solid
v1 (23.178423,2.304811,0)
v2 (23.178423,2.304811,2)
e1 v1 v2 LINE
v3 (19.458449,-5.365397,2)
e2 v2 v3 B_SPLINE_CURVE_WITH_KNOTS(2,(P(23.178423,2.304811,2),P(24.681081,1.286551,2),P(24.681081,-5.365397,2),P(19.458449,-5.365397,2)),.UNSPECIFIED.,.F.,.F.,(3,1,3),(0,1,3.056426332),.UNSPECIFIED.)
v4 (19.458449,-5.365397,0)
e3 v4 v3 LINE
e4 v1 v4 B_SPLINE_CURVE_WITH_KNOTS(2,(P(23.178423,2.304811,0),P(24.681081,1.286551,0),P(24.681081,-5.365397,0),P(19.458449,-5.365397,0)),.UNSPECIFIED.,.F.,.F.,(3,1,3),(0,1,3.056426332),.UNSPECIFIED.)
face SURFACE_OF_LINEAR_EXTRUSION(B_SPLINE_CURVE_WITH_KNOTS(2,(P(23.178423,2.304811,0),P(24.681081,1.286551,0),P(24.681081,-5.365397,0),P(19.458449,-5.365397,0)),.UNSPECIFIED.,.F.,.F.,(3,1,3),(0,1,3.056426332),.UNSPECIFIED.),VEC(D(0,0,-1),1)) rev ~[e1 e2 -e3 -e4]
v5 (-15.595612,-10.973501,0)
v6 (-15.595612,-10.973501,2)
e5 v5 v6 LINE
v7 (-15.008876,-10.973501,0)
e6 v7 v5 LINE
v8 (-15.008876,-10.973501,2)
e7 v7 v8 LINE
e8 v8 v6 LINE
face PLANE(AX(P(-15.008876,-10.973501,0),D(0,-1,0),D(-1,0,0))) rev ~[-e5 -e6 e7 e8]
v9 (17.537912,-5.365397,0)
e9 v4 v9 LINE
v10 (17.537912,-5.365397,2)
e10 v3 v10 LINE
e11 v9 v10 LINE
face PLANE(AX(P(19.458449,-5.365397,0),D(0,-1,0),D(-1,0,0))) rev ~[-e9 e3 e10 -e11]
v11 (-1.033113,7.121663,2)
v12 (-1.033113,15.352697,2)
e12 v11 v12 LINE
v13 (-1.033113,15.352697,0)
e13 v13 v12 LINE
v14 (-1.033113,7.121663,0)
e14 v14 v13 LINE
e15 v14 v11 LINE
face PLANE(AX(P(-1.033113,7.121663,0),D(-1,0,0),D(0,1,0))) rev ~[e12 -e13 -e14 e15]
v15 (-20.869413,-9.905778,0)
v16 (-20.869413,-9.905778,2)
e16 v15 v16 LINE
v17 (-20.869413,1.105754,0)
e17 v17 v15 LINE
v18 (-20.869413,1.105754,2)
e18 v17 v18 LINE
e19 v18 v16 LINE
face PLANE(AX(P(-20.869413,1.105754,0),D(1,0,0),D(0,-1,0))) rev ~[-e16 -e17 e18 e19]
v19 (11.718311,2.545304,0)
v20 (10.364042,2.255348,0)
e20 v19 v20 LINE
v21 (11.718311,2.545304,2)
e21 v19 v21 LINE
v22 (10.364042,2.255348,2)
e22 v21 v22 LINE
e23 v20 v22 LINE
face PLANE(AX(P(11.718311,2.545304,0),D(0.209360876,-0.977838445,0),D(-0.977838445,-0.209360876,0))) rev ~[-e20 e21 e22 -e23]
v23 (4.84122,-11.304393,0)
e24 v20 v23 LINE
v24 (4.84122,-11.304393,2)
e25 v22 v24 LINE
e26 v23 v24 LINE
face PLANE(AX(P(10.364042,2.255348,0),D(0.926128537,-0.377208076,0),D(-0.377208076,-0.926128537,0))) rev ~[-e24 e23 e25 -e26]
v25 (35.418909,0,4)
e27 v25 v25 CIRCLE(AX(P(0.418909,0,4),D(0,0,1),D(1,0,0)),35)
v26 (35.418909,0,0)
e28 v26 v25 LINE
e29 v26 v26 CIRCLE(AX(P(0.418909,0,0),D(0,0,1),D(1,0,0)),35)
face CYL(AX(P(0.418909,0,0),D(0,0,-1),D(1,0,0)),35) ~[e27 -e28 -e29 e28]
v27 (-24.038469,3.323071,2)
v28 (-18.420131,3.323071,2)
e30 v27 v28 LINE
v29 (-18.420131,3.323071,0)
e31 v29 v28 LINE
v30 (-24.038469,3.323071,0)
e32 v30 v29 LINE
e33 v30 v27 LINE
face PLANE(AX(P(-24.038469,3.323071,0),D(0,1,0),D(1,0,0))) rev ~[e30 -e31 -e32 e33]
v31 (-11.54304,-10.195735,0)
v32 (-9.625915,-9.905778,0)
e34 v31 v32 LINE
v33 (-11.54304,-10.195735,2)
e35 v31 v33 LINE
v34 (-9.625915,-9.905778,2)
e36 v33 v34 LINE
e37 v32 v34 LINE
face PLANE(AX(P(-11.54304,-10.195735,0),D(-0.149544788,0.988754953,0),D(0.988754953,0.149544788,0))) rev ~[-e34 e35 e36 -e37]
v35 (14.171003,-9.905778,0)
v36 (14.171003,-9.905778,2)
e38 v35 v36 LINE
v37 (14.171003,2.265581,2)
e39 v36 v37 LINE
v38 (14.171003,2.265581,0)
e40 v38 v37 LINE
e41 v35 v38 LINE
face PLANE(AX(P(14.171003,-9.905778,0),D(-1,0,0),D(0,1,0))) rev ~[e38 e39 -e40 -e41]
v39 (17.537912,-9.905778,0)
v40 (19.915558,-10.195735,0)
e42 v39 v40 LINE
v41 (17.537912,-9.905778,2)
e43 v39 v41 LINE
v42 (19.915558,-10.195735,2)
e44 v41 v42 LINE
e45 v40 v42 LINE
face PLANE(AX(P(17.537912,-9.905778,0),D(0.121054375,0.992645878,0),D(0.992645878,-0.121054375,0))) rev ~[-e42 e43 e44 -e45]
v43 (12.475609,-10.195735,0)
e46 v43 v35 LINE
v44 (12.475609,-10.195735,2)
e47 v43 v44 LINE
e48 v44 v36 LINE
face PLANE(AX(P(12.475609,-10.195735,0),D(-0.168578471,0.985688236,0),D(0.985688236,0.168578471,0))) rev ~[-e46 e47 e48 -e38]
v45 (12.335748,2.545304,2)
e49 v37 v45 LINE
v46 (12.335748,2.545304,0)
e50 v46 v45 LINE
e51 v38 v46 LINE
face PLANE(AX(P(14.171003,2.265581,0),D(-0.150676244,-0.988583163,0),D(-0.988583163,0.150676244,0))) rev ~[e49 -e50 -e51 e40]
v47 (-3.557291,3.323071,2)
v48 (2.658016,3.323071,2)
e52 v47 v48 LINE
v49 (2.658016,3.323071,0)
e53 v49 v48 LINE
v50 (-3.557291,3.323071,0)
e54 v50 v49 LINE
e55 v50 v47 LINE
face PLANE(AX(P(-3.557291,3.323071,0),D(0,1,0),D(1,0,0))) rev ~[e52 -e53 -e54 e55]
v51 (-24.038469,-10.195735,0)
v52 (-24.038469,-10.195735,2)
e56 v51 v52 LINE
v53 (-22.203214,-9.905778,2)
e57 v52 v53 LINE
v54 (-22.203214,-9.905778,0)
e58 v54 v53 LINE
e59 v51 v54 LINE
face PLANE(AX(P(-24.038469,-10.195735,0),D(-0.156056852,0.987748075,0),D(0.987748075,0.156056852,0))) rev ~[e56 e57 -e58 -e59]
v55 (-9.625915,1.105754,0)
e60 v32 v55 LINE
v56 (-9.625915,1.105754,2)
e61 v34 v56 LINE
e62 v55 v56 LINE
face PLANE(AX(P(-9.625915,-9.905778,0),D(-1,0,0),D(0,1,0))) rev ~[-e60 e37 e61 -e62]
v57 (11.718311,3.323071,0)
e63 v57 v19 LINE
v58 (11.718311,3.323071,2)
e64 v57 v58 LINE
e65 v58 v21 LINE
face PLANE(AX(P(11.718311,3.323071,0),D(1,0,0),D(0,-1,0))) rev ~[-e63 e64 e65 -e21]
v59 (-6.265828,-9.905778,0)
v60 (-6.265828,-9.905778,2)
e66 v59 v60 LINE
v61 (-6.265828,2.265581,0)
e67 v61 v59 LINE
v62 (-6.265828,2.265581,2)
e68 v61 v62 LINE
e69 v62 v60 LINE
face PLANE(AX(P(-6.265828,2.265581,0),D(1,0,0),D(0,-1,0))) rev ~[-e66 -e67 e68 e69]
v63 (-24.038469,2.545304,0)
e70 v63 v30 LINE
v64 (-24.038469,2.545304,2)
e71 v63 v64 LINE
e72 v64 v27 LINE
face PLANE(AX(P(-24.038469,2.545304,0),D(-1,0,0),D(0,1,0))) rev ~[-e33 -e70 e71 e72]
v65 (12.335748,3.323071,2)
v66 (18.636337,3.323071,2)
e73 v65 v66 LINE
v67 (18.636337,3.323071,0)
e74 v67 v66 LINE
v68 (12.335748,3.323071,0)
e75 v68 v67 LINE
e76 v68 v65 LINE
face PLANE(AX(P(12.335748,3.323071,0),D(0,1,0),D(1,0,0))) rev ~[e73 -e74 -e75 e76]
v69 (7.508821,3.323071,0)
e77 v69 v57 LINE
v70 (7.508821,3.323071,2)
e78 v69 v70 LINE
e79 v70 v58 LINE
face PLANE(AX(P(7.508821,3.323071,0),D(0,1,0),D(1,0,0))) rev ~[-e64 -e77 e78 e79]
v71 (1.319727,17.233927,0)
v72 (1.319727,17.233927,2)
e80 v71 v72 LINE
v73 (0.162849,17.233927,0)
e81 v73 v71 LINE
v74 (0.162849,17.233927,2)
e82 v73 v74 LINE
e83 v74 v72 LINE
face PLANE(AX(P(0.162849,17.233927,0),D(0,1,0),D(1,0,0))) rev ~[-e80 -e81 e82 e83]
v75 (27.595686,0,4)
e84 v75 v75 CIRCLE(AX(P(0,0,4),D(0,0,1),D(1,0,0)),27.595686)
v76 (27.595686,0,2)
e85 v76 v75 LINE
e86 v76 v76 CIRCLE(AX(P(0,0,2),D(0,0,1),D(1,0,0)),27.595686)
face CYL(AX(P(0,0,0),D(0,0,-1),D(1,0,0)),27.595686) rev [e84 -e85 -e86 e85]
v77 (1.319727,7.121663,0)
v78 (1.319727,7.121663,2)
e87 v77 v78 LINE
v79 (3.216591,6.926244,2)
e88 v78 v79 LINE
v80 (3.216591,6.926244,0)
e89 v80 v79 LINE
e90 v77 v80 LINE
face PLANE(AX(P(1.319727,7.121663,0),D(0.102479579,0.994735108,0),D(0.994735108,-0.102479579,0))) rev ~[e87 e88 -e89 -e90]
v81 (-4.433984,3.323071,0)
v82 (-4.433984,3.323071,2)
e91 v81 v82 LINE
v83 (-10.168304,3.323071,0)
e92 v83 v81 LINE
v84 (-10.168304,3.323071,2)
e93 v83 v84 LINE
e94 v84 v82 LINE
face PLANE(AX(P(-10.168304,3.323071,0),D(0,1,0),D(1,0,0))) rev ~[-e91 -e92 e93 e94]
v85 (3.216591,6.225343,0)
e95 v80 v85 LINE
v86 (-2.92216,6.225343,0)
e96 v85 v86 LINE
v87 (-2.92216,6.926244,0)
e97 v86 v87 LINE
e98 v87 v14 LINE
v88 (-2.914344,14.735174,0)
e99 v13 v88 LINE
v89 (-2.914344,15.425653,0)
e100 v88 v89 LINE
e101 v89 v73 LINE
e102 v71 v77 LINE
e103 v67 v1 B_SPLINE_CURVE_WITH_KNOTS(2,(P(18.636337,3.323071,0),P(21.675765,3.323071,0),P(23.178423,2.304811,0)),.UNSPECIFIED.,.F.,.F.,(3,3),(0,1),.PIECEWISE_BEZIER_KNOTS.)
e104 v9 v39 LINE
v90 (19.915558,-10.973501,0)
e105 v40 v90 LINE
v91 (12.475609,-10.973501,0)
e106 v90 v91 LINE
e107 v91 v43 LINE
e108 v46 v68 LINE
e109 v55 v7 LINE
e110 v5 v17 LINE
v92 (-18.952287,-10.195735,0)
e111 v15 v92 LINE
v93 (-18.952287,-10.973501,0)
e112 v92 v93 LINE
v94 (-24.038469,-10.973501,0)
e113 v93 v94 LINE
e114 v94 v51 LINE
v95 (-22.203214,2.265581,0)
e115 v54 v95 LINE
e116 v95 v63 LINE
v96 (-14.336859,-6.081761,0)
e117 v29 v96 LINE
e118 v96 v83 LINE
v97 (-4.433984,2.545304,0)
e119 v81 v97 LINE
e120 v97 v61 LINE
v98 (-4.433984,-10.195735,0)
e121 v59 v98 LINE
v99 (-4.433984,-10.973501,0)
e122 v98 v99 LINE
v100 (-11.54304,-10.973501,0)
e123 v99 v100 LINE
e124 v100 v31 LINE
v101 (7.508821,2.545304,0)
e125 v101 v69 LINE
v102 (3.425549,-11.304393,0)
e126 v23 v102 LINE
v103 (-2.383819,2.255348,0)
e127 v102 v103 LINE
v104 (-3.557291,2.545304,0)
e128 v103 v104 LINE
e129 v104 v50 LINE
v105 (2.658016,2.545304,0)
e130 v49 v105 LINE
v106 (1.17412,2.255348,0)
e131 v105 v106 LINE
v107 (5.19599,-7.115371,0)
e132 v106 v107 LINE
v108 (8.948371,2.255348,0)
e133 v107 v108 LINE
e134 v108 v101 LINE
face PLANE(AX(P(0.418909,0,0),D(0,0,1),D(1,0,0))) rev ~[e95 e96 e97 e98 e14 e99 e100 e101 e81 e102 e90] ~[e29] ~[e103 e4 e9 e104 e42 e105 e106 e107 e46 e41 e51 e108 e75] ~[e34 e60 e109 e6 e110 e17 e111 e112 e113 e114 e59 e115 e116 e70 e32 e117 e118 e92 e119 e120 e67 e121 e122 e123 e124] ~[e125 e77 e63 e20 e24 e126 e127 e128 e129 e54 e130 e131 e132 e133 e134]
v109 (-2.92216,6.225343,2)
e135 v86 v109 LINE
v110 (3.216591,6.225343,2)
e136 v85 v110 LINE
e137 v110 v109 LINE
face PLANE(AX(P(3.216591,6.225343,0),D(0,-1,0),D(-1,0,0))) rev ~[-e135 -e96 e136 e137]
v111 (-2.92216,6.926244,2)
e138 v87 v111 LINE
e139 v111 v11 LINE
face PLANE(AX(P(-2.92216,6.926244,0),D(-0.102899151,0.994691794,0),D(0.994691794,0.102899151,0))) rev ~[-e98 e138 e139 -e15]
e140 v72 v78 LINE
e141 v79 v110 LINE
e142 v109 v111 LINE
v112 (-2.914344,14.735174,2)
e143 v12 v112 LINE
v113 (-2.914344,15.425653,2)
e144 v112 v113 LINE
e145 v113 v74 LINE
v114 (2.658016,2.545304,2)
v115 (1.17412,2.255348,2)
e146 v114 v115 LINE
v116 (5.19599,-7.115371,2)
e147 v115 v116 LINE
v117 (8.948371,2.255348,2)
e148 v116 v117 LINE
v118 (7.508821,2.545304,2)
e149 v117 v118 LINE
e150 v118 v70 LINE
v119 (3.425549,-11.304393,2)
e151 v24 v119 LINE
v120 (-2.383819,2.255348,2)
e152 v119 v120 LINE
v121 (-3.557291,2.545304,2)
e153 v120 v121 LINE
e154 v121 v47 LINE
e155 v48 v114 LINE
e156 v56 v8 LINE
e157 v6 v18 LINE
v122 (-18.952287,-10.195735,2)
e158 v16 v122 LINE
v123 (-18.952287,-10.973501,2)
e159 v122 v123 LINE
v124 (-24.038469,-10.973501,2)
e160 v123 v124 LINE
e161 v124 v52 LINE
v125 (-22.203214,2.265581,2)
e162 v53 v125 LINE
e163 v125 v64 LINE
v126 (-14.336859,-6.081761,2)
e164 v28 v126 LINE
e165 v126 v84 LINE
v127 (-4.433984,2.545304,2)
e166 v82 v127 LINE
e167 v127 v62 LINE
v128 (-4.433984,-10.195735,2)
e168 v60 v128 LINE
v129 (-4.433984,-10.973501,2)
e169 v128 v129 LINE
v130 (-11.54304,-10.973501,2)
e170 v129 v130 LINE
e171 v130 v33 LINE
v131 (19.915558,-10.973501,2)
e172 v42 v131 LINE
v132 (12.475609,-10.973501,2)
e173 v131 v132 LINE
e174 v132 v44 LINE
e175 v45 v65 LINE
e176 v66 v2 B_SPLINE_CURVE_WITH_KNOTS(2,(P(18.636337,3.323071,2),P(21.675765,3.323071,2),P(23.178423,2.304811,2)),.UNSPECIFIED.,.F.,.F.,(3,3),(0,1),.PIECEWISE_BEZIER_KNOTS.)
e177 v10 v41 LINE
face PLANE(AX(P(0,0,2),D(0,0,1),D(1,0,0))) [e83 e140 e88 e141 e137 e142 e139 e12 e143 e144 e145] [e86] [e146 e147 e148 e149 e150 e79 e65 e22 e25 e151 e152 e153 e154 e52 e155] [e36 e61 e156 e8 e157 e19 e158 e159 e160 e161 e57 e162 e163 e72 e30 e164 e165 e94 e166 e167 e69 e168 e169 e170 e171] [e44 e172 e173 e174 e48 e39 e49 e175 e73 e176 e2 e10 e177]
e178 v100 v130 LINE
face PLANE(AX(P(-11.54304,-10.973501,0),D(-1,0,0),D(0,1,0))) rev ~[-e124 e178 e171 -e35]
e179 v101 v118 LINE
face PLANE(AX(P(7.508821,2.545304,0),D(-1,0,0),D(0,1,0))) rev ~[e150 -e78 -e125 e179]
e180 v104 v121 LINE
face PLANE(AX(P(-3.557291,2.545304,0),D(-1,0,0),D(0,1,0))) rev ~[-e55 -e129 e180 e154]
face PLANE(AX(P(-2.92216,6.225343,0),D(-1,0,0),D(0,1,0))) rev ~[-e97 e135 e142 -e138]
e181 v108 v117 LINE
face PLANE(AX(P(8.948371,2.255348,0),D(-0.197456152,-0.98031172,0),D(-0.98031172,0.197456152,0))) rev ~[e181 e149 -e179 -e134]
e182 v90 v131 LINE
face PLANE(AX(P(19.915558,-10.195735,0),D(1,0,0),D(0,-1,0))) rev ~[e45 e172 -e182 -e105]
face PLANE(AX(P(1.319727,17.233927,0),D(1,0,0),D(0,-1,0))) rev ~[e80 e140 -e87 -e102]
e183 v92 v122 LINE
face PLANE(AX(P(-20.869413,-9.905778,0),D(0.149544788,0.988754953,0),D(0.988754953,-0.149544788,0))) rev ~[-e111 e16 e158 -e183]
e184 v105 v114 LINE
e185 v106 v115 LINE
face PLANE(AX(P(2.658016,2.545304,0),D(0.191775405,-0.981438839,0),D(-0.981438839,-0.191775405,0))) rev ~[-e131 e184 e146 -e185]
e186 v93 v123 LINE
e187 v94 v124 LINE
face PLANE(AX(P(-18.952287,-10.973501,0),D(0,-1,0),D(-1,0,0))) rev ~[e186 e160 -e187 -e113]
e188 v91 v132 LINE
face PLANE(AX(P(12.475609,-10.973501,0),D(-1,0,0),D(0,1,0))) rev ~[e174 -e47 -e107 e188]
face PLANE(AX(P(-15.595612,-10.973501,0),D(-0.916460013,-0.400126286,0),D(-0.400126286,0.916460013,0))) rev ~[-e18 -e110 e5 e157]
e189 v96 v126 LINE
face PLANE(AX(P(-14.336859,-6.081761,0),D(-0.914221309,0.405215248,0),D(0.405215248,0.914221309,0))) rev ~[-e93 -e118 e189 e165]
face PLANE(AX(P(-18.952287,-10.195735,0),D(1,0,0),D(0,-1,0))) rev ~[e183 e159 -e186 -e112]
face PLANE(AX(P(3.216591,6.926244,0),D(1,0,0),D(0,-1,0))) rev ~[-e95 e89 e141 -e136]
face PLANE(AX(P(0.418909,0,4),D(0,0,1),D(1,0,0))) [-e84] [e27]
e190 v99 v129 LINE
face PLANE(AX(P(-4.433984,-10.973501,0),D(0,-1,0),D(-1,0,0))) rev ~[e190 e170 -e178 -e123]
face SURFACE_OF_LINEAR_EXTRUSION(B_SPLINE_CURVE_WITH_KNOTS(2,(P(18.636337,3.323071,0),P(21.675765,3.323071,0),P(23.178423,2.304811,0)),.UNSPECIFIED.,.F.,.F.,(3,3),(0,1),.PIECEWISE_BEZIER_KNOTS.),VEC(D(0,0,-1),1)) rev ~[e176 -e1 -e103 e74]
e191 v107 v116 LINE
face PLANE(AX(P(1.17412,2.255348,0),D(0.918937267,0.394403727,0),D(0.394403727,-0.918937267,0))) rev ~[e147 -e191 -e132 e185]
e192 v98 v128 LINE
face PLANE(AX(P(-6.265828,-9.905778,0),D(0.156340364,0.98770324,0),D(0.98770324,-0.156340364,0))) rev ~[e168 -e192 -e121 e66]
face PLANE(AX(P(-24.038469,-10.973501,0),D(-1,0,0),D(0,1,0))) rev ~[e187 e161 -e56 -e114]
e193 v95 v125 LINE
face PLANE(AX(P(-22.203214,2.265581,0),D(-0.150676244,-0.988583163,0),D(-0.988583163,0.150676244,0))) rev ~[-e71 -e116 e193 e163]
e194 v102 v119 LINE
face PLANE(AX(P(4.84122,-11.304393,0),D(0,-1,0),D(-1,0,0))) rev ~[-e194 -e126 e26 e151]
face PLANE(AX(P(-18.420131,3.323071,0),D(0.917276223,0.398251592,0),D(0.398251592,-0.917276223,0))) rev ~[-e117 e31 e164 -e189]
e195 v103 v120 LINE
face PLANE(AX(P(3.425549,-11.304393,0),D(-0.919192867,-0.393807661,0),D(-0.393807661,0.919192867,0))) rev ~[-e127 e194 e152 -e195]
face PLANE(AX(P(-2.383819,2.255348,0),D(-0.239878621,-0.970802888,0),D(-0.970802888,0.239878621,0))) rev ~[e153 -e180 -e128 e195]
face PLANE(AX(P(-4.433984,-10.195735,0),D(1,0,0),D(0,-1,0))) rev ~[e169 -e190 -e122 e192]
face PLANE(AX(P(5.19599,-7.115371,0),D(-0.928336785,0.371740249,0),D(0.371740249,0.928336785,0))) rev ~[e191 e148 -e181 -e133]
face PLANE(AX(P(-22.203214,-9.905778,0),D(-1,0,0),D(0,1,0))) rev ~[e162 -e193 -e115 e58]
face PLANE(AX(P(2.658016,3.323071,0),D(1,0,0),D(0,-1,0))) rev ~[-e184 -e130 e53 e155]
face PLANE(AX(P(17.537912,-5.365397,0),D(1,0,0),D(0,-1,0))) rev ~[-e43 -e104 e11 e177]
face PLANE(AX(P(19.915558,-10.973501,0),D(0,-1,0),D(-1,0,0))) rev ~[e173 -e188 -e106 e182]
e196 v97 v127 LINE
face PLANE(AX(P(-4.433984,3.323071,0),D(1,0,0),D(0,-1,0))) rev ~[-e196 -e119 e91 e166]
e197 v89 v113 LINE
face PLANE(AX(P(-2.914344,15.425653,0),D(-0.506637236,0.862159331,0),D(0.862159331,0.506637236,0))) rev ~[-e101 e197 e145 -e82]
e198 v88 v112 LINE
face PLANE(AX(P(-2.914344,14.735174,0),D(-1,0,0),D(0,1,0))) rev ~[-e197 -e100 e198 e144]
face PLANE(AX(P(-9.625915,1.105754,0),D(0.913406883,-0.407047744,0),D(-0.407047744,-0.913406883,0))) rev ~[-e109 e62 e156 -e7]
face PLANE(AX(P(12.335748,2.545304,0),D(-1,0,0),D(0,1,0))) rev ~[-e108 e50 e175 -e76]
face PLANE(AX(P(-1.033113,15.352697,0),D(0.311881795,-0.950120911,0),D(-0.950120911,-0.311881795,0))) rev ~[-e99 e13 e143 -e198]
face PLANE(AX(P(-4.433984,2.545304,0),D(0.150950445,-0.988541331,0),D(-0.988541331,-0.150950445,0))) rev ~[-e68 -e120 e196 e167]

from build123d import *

# Parameters (mm, degrees)
F0_R     = 27.5956860517
F1_DEPTH = 2
F0_R_2   = 35
F2_DEPTH = 4


with BuildPart() as f1:
    # F0 (on Top) → F1 (new body)
    with BuildSketch(Plane.XY):
        Circle(F0_R)
        Polygon((-9.6259148038, 1.1057544772), (-15.0088759263, -10.9735011217), (-15.5956118662, -10.9735011217), (-20.8694128139, 1.1057544772), (-20.8694128139, -9.9057781613), (-18.952287243, -10.1957348758), (-18.952287243, -10.9735011217), (-24.0384691402, -10.9735011217), (-24.0384691402, -10.1957348758), (-22.2032137004, -9.9057781613), (-22.2032137004, 2.265581335), (-24.0384691402, 2.5453042831), (-24.0384691402, 3.3230705289), (-18.4201313906, 3.3230705289), (-14.3368585999, -6.0817607859), (-10.1683044226, 3.3230705289), (-4.4339839872, 3.3230705289), (-4.4339839872, 2.5453042831), (-6.2658281715, 2.265581335), (-6.2658281715, -9.9057781613), (-4.4339839872, -10.1957348758), (-4.4339839872, -10.9735011217), (-11.5430403747, -10.9735011217), (-11.5430403747, -10.1957348758), (-9.6259148038, -9.9057781613), align=None, mode=Mode.SUBTRACT)
        Polygon((7.508821393, 3.3230705289), (11.7183106359, 3.3230705289), (11.7183106359, 2.5453042831), (10.3640422166, 2.2553475686), (4.84121962, -11.3043929017), (3.4255486024, -11.3043929017), (-2.3838194532, 2.2553475686), (-3.5572913329, 2.5453042831), (-3.5572913329, 3.3230705289), (2.6580161229, 3.3230705289), (2.6580161229, 2.5453042831), (1.174119996, 2.2553475686), (5.1959901883, -7.1153711916), (8.948371199, 2.2553475686), (7.508821393, 2.5453042831), align=None, mode=Mode.SUBTRACT)
        with BuildLine():
            Line((19.4584492842, -5.3653971385), (17.5379124579, -5.3653971385))
            Line((17.5379124579, -5.3653971385), (17.5379124579, -9.9057781613))
            Line((17.5379124579, -9.9057781613), (19.9155575165, -10.1957348758))
            Line((19.9155575165, -10.1957348758), (19.9155575165, -10.9735011217))
            Line((19.9155575165, -10.9735011217), (12.475609349, -10.9735011217))
            Line((12.475609349, -10.9735011217), (12.475609349, -10.1957348758))
            Line((12.475609349, -10.1957348758), (14.1710033147, -9.9057781613))
            Line((14.1710033147, -9.9057781613), (14.1710033147, 2.265581335))
            Line((14.1710033147, 2.265581335), (12.3357478749, 2.5453042831))
            Line((12.3357478749, 2.5453042831), (12.3357478749, 3.3230705289))
            Line((12.3357478749, 3.3230705289), (18.6363367174, 3.3230705289))
            add(Edge.make_bspline(
                [(18.6363367174, 3.3230705289), (21.675765336, 3.3230705289), (23.178423368, 2.3048107729)],
                knots=[0, 0, 0, 1, 1, 1], degree=2))
            add(Edge.make_bspline(
                [(23.178423368, 2.3048107729), (24.6810814, 1.2865510168), (24.6810814, -0.8898299694)],
                knots=[0, 0, 0, 1, 1, 1], degree=2))
            add(Edge.make_bspline(
                [(24.6810814, -0.8898299694), (24.6810814, -5.3653971385), (19.4584492842, -5.3653971385)],
                knots=[0, 0, 0, 1, 1, 1], degree=2))
        make_face(mode=Mode.SUBTRACT)
        Polygon((1.3197273183, 17.2339269534), (1.3197273183, 7.1216629411), (3.216591065, 6.9262442858), (3.216591065, 6.2253427091), (-2.9221602911, 6.2253427091), (-2.9221602911, 6.9262442858), (-1.0331132906, 7.1216629411), (-1.0331132906, 15.3526966991), (-2.9143435449, 14.7351737486), (-2.9143435449, 15.4256529971), (0.1628488794, 17.2339269534), align=None, mode=Mode.SUBTRACT)
    extrude(amount=F1_DEPTH)

    # F0 (on Top) → F2 (join)
    with BuildSketch(Plane.XY):
        with Locations((0.418909197, 0)):
            Circle(F0_R_2)
        Circle(F0_R, mode=Mode.SUBTRACT)
    extrude(amount=F2_DEPTH)


solid = f1.part
